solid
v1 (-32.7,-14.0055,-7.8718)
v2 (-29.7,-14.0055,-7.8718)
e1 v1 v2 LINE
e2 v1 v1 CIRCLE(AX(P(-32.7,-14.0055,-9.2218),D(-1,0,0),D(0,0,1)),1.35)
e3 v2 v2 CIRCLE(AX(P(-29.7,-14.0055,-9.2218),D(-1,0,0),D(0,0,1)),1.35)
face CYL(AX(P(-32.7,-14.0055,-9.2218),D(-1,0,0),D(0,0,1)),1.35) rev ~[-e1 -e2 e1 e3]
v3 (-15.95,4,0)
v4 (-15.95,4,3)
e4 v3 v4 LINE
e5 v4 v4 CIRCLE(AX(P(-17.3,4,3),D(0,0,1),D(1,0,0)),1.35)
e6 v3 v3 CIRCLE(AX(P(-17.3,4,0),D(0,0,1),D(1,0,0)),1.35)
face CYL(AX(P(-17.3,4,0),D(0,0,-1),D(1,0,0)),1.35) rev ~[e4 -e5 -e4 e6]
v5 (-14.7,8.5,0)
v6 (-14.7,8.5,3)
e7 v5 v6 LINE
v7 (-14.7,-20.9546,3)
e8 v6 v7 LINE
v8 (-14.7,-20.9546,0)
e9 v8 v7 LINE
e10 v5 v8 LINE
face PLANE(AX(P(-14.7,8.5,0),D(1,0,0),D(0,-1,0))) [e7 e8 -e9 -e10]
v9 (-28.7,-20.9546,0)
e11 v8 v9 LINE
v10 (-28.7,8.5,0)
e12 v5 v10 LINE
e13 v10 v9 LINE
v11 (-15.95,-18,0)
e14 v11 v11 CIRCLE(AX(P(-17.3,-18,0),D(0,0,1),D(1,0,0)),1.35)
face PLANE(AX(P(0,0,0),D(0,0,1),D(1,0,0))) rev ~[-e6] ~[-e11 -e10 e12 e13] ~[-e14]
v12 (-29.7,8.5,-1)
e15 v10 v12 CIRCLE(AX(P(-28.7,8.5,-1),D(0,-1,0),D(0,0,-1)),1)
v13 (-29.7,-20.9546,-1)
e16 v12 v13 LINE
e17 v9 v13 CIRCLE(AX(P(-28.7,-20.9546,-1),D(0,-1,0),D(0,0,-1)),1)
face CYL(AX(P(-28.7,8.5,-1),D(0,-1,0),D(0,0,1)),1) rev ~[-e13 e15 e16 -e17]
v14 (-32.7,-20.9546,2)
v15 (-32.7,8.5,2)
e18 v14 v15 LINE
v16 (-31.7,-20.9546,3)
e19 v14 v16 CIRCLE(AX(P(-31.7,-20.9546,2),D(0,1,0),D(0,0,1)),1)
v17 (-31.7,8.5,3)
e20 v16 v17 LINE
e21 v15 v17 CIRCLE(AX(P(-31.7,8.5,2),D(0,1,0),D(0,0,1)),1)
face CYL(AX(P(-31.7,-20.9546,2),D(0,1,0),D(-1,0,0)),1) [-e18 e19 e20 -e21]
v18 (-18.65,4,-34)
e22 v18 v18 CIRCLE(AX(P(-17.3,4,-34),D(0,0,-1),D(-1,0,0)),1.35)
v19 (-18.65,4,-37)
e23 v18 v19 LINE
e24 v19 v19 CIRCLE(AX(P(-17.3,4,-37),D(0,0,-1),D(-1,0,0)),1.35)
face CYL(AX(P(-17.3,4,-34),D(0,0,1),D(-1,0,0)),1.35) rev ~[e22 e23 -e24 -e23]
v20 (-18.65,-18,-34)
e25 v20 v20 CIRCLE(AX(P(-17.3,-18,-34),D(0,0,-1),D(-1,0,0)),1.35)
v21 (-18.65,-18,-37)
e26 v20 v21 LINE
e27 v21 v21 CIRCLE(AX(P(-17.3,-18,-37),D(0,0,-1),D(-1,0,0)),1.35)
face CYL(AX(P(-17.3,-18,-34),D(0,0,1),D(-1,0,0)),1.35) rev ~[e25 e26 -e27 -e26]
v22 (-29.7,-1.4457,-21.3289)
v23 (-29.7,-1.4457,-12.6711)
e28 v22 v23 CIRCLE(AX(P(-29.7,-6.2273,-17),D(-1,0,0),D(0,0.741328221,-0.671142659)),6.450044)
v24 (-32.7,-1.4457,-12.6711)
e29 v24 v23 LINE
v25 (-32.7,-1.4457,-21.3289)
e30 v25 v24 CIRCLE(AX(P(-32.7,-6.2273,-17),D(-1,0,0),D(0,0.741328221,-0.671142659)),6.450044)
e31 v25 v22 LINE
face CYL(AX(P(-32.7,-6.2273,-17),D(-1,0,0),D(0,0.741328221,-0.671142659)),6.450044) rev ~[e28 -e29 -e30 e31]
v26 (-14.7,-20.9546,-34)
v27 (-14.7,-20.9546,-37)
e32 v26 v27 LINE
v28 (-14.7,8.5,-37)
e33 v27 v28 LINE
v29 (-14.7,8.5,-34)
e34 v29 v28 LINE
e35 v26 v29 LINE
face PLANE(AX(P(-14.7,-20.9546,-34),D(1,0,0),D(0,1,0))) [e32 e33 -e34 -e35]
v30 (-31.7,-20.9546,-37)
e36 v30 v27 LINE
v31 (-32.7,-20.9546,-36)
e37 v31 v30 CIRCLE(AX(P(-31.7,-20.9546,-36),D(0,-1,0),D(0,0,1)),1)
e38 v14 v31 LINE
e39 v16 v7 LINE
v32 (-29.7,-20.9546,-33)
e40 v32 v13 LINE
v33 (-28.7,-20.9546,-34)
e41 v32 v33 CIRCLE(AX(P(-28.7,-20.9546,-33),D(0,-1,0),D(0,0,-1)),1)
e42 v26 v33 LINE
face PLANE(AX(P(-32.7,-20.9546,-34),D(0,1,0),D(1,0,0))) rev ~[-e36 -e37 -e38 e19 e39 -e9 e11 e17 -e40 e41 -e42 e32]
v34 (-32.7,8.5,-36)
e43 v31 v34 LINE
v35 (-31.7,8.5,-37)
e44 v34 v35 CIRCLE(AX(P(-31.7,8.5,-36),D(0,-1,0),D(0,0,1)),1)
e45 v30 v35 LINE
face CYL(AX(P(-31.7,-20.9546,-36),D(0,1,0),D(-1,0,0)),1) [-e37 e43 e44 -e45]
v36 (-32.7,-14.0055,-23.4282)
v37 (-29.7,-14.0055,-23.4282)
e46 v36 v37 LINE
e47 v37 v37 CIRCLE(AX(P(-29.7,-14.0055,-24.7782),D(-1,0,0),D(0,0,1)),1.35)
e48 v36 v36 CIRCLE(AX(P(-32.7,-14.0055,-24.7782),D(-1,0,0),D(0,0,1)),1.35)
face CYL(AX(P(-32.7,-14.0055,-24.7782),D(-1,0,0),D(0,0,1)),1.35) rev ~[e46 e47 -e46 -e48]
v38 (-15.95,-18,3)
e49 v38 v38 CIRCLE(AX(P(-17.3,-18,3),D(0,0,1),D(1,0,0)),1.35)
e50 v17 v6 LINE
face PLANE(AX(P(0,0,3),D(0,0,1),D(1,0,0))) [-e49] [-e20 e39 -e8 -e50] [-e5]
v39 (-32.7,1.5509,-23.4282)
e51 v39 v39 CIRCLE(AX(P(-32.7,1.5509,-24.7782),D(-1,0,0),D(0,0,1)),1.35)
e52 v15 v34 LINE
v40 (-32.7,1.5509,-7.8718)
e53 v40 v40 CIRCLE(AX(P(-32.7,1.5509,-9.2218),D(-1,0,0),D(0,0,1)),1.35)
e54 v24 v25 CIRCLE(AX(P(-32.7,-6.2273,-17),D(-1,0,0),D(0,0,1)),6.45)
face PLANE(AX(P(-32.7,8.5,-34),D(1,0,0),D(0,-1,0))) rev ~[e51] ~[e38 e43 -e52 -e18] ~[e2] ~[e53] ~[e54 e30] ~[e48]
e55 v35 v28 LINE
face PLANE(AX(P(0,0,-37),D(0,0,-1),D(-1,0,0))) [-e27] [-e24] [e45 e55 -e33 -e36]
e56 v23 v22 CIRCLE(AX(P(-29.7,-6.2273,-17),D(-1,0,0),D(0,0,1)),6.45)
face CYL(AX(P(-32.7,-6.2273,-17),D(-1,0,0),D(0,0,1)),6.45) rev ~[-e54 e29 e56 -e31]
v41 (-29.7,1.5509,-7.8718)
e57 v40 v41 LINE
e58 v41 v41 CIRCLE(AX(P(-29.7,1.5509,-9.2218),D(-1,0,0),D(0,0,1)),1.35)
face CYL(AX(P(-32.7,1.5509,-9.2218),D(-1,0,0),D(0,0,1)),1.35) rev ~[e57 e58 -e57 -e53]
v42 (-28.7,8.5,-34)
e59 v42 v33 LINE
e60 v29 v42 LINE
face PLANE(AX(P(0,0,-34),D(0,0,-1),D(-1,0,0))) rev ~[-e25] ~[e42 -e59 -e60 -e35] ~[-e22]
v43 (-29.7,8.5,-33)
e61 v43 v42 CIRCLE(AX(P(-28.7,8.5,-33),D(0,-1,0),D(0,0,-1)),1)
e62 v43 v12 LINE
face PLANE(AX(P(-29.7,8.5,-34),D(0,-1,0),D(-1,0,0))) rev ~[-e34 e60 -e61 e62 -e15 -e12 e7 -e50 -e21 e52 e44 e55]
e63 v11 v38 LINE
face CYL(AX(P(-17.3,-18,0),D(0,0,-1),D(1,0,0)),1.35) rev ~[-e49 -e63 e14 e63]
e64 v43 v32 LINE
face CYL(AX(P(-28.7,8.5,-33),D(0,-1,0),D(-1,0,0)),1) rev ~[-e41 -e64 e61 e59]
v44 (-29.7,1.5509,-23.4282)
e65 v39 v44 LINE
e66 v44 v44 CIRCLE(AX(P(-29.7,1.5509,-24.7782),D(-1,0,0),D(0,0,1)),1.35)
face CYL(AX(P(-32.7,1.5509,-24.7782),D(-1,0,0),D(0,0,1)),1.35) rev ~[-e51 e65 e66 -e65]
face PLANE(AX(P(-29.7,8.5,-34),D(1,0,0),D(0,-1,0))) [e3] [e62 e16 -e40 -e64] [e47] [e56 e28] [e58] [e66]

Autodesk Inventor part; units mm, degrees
ref_plane "YZ Plane" through (0, 0, 0) normal (1, 0, 0) x (0, 1, 0)
ref_plane "XZ Plane" through (0, 0, 0) normal (0, 1, 0) x (-1, 0, 0)
ref_plane "XY Plane" through (0, 0, 0) normal (0, 0, 1) x (1, 0, 0)
ref_plane "작업 평면1" through (0, 0, -34) normal (0, 0, -1) x (-1, 0, 0)
sketch "스케치1" plane through (0, 0, -34) normal (0, 0, -1) x (-1, 0, 0)
  circle A0 centre (17.3, -18) radius 1.35 projected
  line L0 (20.1, -44.6) -> (20.1, 8.5) projected
  line L1 (14.5, -42) -> (14.5, 11.5) projected
  circle A1 centre (17.3, 4) radius 1.35 projected
  circle A2 centre (17.3, -18) radius 1.45
  circle A3 centre (17.3, 4) radius 1.45
  line L2 (14.7, -42) -> (14.7, 11.5)
  line L3 (14.7, 11.5) -> (20.1, 8.5)
  line L4 (14.7, -20.9546) -> (32.7, -20.9546)
  line L5 (32.7, -20.9546) -> (32.7, 8.5)
  line L6 (32.7, 8.5) -> (20.1, 8.5)
  line L7 (32.7, -20.9546) -> (26.7, -20.9546)
  line L8 (26.7, -20.9546) -> (26.7, 8.5)
  line L9 (26.7, 8.5) -> (32.7, 8.5)
  line L10 (32.7, 8.5) -> (32.7, -20.9546)
  line L11 (20.1, 8.5) -> (14.7, 8.5)
  point P0 (0, 0)
  dimension "d0" = 0.1
  dimension "d1" = 0.1
  dimension "d2" = 0.2
  dimension "d3" = 18
  dimension "d8" = 6
extrude "돌출1" add sketch "스케치1" along normal blind 3 contours L4 L2 L11 L0 | L0 L6 L8 L4 | L8 L6 L5 L4 | A2 | A3
sketch "스케치2" plane through (0, 0, -34) normal (0, 0, 1) x (1, 0, 0)
  line L0 (-20.1, 8.5) -> (-14.7, 11.5) projected
  line L1 (-14.7, 8.5) -> (-14.7, -20.9546) projected
  line L2 (-20.1, -44.6) -> (-20.1, 8.5) projected
  line L3 (-32.7, 8.5) -> (-14.7, 8.5) projected
  line L4 (-32.7, -20.9546) -> (-32.7, 8.5) projected
  line L5 (-14.7, -20.9546) -> (-32.7, -20.9546) projected
  line L6 (-20.1, -20.9546) -> (-32.7, -20.9546)
  line L7 (-32.7, -20.9546) -> (-32.7, 8.5)
  line L8 (-32.7, 8.5) -> (-20.1, 8.5)
  line L9 (-20.1, 8.5) -> (-20.1, -20.9546)
  line L10 (-20.1, -20.9546) -> (-14.7, -20.9546)
  line L11 (-14.7, 11.5) -> (-20.1, 8.5)
  circle A0 centre (-17.3, -18) radius 1.45 projected
  circle A1 centre (-17.3, 4) radius 1.35 projected
  circle A2 centre (-17.3, 4) radius 1.45 projected
  circle A3 centre (-17.3, 4) radius 1.45
  circle A4 centre (-17.3, -18) radius 1.45
  point P0 (0, 0)
ref_plane "작업 평면2" through (0, 0, 0) normal (0, 0, 1) x (1, 0, 0)
sketch "스케치3" plane through (0, 0, 0) normal (0, 0, 1) x (1, 0, 0)
  line L0 (-32.7, 8.5) -> (-14.7, 8.5) projected
  line L1 (-32.7, -20.9546) -> (-32.7, 8.5) projected
  line L2 (-14.7, -20.9546) -> (-32.7, -20.9546) projected
  line L3 (-14.7, 8.5) -> (-14.7, -20.9546) projected
  line L4 (-20.1, -20.9546) -> (-32.7, -20.9546)
  line L5 (-32.7, -20.9546) -> (-32.7, 8.5)
  line L6 (-32.7, 8.5) -> (-20.1, 8.5)
  line L7 (-20.1, 8.5) -> (-20.1, -20.9546)
  line L8 (-32.7, -20.9546) -> (-20.1, -20.9546)
  line L9 (-20.1, -20.9546) -> (-20.1, 8.5)
  line L10 (-20.1, 8.5) -> (-32.7, 8.5)
  line L11 (-32.7, 8.5) -> (-32.7, -20.9546)
  line L12 (-20.1, -20.9546) -> (-14.7, -20.9546)
  line L13 (-14.7, 8.5) -> (-14.7, -20.9546) projected
  line L14 (-14.7, 11.5) -> (-20.1, 8.5)
  circle A0 centre (-17.3, -18) radius 1.45
  circle A1 centre (-17.3, 4) radius 1.45
  circle A2 centre (-17.3, 4) radius 1.35
  circle A3 centre (-17.3, -18) radius 1.35
  point P0 (0, 0)
  dimension "d26" = 2.7
  dimension "d27" = 2.7
extrude "돌출2" add sketch "스케치3" along normal blind 3 contours L0 L7 L2 L1 | L0 L3 L2 L7 | A0 | A1
sketch "스케치4" plane through (0, 0, -34) normal (0, 0, 1) x (1, 0, 0)
  line L0 (-14.7, -20.9546) -> (-14.7, 8.5) projected
  line L1 (-14.7, 8.5) -> (-32.7, 8.5) projected
  line L2 (-32.7, 8.5) -> (-32.7, -20.9546) projected
  line L3 (-32.7, -20.9546) -> (-14.7, -20.9546) projected
  line L4 (-32.7, 8.5) -> (-26.7, 8.5)
  line L5 (-26.7, -20.9546) -> (-32.7, -20.9546)
  line L6 (-32.7, -20.9546) -> (-32.7, 8.5)
  line L7 (-32.7, 8.5) -> (-29.7, 8.5)
  line L8 (-29.7, 8.5) -> (-29.7, -20.9546)
  line L9 (-29.7, -20.9546) -> (-32.7, -20.9546)
  line L10 (-32.7, -20.9546) -> (-32.7, 8.5)
  point P0 (0, 0)
  point P1 (-29.7, -20.9546)
extrude "돌출3" add sketch "스케치4" along normal up to surface (34 mm away) contours L3 L2 L1 L8
sketch "스케치5" plane through (-32.7, -20.9546, -37) normal (-1, 0, 0) x (0, 0, 1)
  line L0 (40, 29.4546) -> (0, 29.4546) projected
  line L1 (0, 0) -> (0, 29.4546) projected
  line L2 (40, 0) -> (0, 0) projected
  line L3 (40, 29.4546) -> (40, 0) projected
  line L4 (40, 0) -> (0, 0) projected
  circle A0 centre (20, 14.7273) radius 14
  arc A1 (15, 20.2502) -> (25, 20.2502) centre (20, 14.7273) ccw
  circle A2 centre (20, 14.7273) radius 1.6
  circle A3 centre (12.2218, 22.5055) radius 1.35
  circle A4 centre (27.7782, 22.5055) radius 1.35
  circle A5 centre (27.7782, 6.9491) radius 1.35
  circle A6 centre (12.2218, 6.9491) radius 1.35
  arc A7 (15.6711, 19.5089) -> (24.3289, 19.5089) centre (20, 14.7273) ccw
  circle A8 centre (20, 14.7273) radius 6.45
  point P0 (37, 20.9546)
  point P1 (24.3289, 19.5089)
  point P2 (15.6711, 19.5089)
  dimension "d20" = 3.2
  dimension "d21" = 2.7
  dimension "d22" = 2.7
  dimension "d23" = 2.7
  dimension "d24" = 2.7
  dimension "d25" = 1
extrude "돌출4" cut sketch "스케치5" against normal blind 10 contours A2 | A3 | A4 | A5 | A6 | A8 A7
fillet "모깎기1" radius 1 4 edges at (-32.7, -6.2273, 3) (-32.7, -6.2273, -37) (-29.7, -6.2273, -34) (-29.7, -6.2273, 0)
properties part number "3D_ankle2" material "PMMA 플라스틱"
